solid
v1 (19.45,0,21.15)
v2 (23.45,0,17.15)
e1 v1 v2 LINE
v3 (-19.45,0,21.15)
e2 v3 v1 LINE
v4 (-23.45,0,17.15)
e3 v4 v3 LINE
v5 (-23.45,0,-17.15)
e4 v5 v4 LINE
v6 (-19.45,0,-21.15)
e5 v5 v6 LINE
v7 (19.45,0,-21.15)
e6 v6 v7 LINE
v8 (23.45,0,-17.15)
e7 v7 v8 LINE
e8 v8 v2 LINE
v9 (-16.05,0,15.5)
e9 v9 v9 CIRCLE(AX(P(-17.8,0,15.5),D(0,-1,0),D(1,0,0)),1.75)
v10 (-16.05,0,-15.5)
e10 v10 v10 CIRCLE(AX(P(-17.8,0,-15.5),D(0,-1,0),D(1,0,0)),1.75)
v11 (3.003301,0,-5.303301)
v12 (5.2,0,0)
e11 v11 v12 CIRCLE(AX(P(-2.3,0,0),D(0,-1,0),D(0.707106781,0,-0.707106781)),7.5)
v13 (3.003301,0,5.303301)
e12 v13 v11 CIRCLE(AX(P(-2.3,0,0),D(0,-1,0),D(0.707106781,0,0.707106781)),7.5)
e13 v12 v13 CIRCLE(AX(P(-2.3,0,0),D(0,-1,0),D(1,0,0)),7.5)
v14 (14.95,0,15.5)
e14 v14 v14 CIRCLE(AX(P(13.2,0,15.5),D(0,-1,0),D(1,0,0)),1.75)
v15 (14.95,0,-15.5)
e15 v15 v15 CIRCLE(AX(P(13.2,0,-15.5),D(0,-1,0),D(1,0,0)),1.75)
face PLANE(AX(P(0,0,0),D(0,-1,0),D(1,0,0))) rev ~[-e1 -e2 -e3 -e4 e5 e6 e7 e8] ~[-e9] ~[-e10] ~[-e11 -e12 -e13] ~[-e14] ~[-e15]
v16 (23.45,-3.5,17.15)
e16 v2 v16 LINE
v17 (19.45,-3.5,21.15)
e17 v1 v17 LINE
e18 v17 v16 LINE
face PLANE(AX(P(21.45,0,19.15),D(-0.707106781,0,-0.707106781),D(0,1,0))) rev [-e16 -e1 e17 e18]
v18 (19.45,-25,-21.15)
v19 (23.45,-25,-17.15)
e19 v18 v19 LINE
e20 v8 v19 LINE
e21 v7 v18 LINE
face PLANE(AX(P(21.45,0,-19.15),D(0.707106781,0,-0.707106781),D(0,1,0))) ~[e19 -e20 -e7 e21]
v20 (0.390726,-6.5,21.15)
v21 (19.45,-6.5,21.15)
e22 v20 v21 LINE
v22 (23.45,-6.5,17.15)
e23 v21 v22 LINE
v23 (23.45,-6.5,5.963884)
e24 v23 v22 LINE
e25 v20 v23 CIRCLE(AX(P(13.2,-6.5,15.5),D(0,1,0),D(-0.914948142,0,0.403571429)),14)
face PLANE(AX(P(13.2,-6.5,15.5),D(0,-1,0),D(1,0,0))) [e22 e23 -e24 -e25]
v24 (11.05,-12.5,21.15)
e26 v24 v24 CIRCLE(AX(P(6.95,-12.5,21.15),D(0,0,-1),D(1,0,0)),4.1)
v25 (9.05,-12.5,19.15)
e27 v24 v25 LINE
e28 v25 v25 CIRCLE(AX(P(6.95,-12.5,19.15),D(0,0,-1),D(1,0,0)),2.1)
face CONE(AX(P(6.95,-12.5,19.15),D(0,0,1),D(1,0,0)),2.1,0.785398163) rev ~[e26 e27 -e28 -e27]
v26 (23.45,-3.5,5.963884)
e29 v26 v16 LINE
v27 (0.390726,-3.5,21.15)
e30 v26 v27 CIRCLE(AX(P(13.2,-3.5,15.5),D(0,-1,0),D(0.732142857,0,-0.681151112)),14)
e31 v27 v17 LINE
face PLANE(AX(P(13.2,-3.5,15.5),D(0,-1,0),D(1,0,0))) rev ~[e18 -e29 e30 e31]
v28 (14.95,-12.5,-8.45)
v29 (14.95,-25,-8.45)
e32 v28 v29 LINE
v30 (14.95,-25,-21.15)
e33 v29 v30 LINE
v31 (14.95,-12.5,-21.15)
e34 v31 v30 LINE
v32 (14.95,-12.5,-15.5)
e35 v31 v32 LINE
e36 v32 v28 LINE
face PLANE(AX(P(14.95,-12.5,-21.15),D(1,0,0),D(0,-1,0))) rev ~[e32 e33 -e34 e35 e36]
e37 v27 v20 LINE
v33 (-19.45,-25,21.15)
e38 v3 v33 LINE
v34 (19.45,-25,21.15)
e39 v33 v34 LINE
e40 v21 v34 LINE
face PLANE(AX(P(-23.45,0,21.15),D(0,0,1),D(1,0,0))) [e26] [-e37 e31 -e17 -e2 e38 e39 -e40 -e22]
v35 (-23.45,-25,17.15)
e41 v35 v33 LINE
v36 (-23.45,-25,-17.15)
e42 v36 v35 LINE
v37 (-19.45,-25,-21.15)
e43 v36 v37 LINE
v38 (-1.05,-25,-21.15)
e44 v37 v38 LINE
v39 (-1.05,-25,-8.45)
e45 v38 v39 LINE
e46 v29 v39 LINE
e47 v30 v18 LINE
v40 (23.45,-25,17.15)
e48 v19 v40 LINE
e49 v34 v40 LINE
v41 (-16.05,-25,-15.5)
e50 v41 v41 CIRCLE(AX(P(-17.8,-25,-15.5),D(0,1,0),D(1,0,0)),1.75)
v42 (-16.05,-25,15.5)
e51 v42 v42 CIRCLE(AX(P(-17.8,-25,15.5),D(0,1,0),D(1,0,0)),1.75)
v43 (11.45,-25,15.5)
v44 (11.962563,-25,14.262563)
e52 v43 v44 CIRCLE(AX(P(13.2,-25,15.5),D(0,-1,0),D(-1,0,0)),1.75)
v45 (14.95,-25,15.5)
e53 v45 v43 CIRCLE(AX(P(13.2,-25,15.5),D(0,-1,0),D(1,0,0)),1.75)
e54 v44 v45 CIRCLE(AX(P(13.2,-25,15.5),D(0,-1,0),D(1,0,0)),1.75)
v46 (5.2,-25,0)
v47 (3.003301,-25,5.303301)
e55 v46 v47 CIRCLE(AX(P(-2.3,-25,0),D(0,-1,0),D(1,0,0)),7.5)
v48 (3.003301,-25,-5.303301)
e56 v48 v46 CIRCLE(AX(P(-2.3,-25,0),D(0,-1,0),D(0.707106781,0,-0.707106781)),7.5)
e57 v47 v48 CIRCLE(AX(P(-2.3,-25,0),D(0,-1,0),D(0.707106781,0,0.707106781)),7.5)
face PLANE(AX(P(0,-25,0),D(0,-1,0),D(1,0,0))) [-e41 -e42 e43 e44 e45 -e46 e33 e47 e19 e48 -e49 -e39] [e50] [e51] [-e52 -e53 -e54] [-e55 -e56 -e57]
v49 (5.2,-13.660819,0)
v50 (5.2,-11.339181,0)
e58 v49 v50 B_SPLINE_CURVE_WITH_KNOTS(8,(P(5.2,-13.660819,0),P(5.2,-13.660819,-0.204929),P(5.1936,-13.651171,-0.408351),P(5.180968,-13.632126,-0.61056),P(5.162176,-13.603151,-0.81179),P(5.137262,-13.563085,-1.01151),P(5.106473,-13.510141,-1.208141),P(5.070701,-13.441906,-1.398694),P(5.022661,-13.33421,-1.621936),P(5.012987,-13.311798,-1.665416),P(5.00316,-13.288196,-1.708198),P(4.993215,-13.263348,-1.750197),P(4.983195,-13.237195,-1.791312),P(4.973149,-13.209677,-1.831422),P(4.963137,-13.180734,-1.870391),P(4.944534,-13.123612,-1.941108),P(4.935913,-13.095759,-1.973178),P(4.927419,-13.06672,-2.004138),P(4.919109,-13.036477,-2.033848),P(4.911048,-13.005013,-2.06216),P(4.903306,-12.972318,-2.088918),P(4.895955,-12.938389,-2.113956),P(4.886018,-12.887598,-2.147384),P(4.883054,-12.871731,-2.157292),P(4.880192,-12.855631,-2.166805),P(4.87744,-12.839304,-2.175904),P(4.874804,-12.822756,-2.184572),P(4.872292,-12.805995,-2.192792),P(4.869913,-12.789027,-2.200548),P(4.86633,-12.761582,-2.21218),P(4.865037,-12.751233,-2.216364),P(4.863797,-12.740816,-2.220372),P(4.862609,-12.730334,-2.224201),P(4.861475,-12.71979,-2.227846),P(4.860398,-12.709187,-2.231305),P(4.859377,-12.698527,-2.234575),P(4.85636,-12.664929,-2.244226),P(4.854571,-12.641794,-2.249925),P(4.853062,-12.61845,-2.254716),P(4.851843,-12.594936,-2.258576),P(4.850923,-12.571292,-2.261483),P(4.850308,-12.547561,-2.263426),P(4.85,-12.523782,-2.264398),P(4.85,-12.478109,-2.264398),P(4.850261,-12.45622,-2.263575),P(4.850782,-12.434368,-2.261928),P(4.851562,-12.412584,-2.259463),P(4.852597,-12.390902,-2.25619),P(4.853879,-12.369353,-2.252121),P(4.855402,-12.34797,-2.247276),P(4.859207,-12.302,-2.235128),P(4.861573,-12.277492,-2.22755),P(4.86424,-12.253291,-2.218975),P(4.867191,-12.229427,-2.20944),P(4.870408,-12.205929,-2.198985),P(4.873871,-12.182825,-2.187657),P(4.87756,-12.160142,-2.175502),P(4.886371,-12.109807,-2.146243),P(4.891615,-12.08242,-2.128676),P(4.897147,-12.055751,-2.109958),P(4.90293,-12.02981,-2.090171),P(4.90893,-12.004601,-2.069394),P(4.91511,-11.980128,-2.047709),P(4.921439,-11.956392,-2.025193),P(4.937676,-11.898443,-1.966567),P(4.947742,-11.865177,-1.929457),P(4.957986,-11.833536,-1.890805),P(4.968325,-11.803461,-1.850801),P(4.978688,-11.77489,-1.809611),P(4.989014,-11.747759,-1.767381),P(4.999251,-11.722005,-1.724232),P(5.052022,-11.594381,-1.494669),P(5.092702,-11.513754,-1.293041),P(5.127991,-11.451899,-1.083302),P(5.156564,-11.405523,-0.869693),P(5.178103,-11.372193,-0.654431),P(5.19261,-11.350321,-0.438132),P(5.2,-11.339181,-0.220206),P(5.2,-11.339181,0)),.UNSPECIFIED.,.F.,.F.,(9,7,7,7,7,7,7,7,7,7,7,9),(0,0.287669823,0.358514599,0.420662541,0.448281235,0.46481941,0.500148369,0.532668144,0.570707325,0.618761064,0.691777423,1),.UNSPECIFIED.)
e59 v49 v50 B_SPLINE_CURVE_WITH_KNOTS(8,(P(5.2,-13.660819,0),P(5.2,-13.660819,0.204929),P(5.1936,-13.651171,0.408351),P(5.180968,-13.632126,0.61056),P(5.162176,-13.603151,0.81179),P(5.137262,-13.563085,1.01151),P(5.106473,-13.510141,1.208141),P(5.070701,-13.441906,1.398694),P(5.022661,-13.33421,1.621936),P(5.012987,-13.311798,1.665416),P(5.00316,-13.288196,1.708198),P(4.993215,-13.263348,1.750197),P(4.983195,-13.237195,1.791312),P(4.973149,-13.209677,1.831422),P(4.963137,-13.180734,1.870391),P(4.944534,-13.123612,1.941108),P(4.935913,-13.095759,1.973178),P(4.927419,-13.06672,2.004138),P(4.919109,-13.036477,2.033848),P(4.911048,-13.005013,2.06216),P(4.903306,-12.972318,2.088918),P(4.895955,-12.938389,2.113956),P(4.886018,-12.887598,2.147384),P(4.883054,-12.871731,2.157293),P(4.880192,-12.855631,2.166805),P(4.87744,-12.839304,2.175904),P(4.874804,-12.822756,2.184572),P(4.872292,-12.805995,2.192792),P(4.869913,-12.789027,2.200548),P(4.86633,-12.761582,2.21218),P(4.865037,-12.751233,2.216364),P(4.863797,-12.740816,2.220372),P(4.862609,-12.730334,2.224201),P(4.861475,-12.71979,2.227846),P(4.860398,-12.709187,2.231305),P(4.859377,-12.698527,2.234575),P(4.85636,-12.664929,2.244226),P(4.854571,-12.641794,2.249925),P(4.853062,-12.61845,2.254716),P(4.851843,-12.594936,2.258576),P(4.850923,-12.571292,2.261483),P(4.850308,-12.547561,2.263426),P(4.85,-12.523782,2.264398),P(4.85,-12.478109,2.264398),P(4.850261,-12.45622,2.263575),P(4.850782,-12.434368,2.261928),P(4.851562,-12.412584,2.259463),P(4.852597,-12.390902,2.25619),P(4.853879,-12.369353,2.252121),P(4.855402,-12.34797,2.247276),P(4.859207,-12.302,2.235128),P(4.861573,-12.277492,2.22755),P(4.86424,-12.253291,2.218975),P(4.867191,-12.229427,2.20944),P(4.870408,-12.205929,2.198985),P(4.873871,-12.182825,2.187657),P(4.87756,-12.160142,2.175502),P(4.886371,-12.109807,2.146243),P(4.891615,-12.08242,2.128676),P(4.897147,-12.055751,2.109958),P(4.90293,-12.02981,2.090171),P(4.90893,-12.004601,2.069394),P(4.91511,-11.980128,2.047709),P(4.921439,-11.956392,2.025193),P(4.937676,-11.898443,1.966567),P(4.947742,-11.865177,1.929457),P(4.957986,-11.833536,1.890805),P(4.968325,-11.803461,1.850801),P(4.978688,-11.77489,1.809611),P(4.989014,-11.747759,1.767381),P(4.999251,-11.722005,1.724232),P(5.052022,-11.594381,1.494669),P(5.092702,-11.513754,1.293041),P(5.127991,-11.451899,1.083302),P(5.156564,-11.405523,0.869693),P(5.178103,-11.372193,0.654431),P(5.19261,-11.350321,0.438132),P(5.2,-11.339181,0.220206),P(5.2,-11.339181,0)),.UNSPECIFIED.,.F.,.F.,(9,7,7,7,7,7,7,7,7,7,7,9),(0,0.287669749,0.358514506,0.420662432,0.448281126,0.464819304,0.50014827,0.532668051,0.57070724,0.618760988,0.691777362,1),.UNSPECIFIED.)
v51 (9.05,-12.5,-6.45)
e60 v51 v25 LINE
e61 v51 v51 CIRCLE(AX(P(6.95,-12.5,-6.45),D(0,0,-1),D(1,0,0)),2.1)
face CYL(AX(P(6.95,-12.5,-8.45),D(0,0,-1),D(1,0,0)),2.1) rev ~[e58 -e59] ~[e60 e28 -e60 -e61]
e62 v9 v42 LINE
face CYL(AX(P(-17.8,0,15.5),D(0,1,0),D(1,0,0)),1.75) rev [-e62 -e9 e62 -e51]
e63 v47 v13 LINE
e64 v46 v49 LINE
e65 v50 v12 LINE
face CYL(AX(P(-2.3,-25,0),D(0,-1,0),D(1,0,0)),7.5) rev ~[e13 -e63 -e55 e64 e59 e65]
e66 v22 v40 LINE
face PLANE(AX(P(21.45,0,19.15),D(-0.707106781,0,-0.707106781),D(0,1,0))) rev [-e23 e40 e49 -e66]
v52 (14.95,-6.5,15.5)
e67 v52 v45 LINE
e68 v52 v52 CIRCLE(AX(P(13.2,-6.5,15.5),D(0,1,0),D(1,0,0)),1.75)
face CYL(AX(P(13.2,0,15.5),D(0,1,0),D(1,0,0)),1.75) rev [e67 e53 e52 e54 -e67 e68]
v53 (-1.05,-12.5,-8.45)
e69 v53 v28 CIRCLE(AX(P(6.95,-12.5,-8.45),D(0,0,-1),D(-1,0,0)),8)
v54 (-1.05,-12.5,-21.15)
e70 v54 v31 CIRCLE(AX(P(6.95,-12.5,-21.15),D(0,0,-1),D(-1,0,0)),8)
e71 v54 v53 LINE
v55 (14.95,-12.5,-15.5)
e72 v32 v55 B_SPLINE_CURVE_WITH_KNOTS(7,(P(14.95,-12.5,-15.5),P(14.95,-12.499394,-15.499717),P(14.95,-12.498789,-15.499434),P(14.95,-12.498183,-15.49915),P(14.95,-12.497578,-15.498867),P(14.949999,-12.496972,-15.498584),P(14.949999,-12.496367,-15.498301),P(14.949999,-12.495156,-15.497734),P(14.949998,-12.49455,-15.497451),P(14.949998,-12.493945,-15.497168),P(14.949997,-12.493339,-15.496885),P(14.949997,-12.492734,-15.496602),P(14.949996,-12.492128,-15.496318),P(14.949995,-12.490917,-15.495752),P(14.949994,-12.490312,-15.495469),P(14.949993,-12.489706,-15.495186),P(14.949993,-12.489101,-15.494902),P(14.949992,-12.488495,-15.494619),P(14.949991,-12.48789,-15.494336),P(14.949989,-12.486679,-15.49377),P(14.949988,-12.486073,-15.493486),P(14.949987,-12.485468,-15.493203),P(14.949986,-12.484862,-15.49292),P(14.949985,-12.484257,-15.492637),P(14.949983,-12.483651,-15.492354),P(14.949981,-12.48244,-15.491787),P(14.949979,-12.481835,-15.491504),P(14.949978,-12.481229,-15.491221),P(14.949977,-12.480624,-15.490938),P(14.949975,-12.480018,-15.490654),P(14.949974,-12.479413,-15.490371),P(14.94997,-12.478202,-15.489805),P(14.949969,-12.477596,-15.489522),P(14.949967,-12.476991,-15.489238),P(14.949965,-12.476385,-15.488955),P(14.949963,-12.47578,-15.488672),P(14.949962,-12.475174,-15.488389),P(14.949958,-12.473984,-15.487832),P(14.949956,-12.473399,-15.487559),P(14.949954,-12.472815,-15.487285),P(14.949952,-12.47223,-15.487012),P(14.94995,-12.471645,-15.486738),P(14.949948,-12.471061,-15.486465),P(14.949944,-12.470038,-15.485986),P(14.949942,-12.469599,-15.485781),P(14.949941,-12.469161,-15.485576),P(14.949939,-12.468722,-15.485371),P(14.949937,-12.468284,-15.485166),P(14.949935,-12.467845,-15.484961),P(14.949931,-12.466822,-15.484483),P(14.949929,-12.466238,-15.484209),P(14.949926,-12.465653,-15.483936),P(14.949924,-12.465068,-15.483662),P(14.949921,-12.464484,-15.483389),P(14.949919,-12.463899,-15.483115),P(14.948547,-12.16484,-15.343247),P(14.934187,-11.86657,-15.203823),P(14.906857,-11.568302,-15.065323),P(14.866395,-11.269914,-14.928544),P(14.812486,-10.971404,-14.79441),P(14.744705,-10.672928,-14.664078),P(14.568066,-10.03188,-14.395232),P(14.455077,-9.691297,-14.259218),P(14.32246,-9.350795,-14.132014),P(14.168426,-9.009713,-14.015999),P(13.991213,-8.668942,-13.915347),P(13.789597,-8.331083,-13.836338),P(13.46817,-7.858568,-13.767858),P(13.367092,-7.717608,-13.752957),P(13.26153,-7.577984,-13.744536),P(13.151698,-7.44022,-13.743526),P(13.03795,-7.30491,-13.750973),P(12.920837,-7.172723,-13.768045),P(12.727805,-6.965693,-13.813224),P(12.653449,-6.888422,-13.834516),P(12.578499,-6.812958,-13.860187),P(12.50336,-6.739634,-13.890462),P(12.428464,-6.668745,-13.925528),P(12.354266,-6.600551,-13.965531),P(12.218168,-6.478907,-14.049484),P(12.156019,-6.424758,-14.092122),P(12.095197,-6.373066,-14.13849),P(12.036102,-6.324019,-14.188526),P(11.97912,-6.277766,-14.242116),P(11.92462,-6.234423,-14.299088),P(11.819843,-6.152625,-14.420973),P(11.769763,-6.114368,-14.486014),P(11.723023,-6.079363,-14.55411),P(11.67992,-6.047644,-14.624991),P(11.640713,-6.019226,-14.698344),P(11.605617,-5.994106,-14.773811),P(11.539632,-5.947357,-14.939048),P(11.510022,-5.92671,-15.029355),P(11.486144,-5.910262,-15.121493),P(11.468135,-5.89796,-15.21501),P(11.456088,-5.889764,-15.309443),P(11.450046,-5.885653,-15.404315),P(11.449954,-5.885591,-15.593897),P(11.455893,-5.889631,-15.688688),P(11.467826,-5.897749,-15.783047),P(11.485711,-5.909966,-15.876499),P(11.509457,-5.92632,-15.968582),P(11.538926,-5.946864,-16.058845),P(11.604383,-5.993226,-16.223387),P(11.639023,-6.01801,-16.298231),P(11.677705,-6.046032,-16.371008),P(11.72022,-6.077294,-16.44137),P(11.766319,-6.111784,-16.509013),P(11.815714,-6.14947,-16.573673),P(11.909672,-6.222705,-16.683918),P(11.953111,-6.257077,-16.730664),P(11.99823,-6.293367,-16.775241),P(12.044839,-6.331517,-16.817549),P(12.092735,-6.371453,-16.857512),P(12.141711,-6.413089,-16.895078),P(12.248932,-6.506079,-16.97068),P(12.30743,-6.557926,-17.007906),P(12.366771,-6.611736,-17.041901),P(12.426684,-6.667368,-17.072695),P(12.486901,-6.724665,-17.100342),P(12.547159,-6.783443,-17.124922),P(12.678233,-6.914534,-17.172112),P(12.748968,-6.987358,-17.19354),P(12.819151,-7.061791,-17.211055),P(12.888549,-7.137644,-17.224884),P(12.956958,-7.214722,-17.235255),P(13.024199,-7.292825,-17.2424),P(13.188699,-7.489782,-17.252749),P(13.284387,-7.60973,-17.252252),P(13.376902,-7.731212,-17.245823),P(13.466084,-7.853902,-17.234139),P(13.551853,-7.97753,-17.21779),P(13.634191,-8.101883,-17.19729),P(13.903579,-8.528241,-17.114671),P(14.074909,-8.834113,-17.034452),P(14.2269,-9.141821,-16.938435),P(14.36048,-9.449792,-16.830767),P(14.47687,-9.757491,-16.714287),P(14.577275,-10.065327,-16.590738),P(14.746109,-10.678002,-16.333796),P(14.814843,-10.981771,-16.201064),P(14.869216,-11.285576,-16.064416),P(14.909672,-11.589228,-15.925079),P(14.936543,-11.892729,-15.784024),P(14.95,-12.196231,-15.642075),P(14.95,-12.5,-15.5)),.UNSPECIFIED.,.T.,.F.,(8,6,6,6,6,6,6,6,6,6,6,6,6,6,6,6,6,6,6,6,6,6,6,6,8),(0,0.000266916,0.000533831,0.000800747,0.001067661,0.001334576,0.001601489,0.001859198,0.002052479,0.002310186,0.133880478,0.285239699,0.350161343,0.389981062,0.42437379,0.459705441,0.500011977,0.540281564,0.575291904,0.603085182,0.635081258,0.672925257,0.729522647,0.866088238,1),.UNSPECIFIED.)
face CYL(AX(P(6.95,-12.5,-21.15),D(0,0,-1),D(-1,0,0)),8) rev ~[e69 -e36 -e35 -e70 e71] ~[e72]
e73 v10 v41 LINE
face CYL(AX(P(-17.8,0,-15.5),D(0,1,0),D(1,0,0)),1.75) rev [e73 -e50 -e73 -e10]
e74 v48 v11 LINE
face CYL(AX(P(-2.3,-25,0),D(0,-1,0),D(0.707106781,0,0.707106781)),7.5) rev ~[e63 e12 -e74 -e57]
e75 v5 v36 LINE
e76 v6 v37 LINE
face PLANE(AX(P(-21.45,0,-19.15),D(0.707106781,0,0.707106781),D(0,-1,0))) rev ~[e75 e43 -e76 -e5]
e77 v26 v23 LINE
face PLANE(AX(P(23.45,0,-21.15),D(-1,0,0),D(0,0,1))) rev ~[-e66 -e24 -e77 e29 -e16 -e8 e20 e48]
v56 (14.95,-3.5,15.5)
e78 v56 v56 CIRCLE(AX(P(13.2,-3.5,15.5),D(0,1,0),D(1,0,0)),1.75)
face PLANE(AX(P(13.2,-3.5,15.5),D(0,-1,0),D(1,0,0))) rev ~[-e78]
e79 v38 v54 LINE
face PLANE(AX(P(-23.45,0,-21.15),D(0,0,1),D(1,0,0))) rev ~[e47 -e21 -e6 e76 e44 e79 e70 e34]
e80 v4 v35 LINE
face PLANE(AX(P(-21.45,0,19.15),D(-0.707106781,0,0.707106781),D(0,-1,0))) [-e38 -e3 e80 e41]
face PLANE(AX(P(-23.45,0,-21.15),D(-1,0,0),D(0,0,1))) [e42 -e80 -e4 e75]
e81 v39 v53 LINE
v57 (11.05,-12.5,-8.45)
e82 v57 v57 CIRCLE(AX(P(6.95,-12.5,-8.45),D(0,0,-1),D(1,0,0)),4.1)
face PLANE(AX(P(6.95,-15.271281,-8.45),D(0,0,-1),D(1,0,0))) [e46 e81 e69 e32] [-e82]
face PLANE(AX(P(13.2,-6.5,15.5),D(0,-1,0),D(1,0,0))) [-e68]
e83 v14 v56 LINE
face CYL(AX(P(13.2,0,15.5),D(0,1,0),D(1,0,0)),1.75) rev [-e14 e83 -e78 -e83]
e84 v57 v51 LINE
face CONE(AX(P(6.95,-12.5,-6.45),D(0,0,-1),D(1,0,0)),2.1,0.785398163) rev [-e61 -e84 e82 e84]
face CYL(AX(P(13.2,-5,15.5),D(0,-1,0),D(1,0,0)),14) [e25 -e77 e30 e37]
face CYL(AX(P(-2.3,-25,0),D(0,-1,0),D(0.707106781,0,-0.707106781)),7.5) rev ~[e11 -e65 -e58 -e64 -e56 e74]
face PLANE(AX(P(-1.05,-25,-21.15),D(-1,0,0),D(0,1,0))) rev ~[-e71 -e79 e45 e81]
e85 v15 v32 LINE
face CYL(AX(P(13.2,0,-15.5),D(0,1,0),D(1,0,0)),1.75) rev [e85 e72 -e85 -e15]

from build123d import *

# Parameters (mm, degrees)
F0_W      = 46.9
F0_H      = 42.3
F0_R      = 1.75
F1_DEPTH  = 25
F2_SIZE   = 4
F4_DEPTH  = 12.7
F5_R      = 2.1
F6_DEPTH  = 29.601
F7_SIZE   = 2
F9_DEPTH  = 25.0010001
F11_R     = 14
F12_DEPTH = 1.5


# Not quite as in the source:
# - a feature names something its author has since deleted; it is built from what else it names


with BuildPart() as f1:
    # F0 (on Front) → F1 (new body)
    with BuildSketch(Plane.XZ):
        Rectangle(F0_W, F0_H)
        with Locations((-17.8, -15.5)):
            Circle(F0_R, mode=Mode.SUBTRACT)
        with Locations((13.2, -15.5)):
            Circle(F0_R, mode=Mode.SUBTRACT)
        with Locations((-17.8, 15.5)):
            Circle(F0_R, mode=Mode.SUBTRACT)
        with Locations((13.2, 15.5)):
            Circle(F0_R, mode=Mode.SUBTRACT)
    extrude(amount=F1_DEPTH)

    # F2
    f2_edges = [f1.edges().sort_by_distance(p)[0] for p in [
        (-23.45, -12.5, 21.15),
        (23.45, -12.5, 21.15),
        (23.45, -12.5, -21.15),
        (-23.45, -12.5, -21.15),
    ]]
    chamfer(f2_edges, length=F2_SIZE)

    # F3 (on face) → F4 (cut)
    with BuildSketch(Plane(origin=(0, 0, -21.15), x_dir=(1, 0, 0), z_dir=(0, 0, -1))):
        with BuildLine():
            Line((6.95, 12.5), (14.95, 12.5))
            ThreePointArc((14.95, 12.5), (6.95, 20.5), (-1.05, 12.5))
            Line((-1.05, 12.5), (6.95, 12.5))
        make_face()
        with BuildLine():
            ThreePointArc((-1.05, 12.5), (6.95, 4.5), (14.95, 12.5))
            Line((14.95, 12.5), (6.95, 12.5))
            Line((6.95, 12.5), (-1.05, 12.5))
        make_face()
        with BuildLine():
            ThreePointArc((-1.05, 12.5), (6.95, 20.5), (14.95, 12.5))
            Line((14.95, 12.5), (14.95, 25))
            Line((14.95, 25), (-1.05, 25))
            Line((-1.05, 25), (-1.05, 12.5))
        make_face()
    extrude(amount=-F4_DEPTH, mode=Mode.SUBTRACT)

    # F5 (on face) → F6 (cut, through all)
    with BuildSketch(Plane(origin=(0, 0, -8.45), x_dir=(1, 0, 0), z_dir=(0, 0, -1))):
        with Locations((6.95, 12.5)):
            Circle(F5_R)
    extrude(amount=-F6_DEPTH, mode=Mode.SUBTRACT)

    # F7
    f7_edges = [f1.edges().sort_by_distance(p)[0] for p in [
        (4.85, -12.5, -8.45),
        (4.85, -12.5, 21.15),
    ]]
    chamfer(f7_edges, length=F7_SIZE)

    # F8 (on face) → F9 (cut, through all)
    with BuildSketch(Plane.XZ.offset(25)):
        with BuildLine():
            Line((-16.05, 15.5), (-17.8, 15.5))
            Line((-17.8, 15.5), (-16.5625631329, 14.2625631329))
            ThreePointArc((-16.5625631329, 14.2625631329), (-16.1832108181, 14.8303039934), (-16.05, 15.5))
        make_face()
        with BuildLine():
            Line((13.2, 15.5), (11.45, 15.5))
            ThreePointArc((11.45, 15.5), (11.5832108181, 14.8303039934), (11.9625631329, 14.2625631329))
            Line((11.9625631329, 14.2625631329), (13.2, 15.5))
        make_face()
        with BuildLine():
            ThreePointArc((-16.05, -15.5), (-16.1832108181, -14.8303039934), (-16.5625631329, -14.2625631329))
            Line((-16.5625631329, -14.2625631329), (-17.8, -15.5))
            Line((-17.8, -15.5), (-16.05, -15.5))
        make_face()
        with BuildLine():
            Line((3.0033008589, 5.3033008589), (-2.3, 0))
            Line((-2.3, 0), (3.0033008589, -5.3033008589))
            ThreePointArc((3.0033008589, -5.3033008589), (4.6290964938, -2.8701257427), (5.2, 0))
            ThreePointArc((5.2, 0), (4.6290964938, 2.8701257427), (3.0033008589, 5.3033008589))
        make_face()
        with BuildLine():
            ThreePointArc((3.0033008589, 5.3033008589), (-2.3, 7.5), (-7.6033008589, 5.3033008589))
            Line((-7.6033008589, 5.3033008589), (-2.3, 0))
            Line((-2.3, 0), (3.0033008589, 5.3033008589))
        make_face()
        with BuildLine():
            Line((-2.3, 0), (-7.6033008589, 5.3033008589))
            ThreePointArc((-7.6033008589, 5.3033008589), (-9.8, 0), (-7.6033008589, -5.3033008589))
            Line((-7.6033008589, -5.3033008589), (-2.3, 0))
        make_face()
        with BuildLine():
            Line((3.0033008589, -5.3033008589), (-2.3, 0))
            Line((-2.3, 0), (-7.6033008589, -5.3033008589))
            ThreePointArc((-7.6033008589, -5.3033008589), (-2.3, -7.5), (3.0033008589, -5.3033008589))
        make_face()
    extrude(amount=-F9_DEPTH, mode=Mode.SUBTRACT)

    # F11 (on offset) → F12 (join, symmetric)
    with BuildSketch(Plane.XZ.offset(5)):
        with Locations((13.2, 15.5)):
            Circle(F11_R)
    extrude(amount=F12_DEPTH, both=True)


solid = f1.part
